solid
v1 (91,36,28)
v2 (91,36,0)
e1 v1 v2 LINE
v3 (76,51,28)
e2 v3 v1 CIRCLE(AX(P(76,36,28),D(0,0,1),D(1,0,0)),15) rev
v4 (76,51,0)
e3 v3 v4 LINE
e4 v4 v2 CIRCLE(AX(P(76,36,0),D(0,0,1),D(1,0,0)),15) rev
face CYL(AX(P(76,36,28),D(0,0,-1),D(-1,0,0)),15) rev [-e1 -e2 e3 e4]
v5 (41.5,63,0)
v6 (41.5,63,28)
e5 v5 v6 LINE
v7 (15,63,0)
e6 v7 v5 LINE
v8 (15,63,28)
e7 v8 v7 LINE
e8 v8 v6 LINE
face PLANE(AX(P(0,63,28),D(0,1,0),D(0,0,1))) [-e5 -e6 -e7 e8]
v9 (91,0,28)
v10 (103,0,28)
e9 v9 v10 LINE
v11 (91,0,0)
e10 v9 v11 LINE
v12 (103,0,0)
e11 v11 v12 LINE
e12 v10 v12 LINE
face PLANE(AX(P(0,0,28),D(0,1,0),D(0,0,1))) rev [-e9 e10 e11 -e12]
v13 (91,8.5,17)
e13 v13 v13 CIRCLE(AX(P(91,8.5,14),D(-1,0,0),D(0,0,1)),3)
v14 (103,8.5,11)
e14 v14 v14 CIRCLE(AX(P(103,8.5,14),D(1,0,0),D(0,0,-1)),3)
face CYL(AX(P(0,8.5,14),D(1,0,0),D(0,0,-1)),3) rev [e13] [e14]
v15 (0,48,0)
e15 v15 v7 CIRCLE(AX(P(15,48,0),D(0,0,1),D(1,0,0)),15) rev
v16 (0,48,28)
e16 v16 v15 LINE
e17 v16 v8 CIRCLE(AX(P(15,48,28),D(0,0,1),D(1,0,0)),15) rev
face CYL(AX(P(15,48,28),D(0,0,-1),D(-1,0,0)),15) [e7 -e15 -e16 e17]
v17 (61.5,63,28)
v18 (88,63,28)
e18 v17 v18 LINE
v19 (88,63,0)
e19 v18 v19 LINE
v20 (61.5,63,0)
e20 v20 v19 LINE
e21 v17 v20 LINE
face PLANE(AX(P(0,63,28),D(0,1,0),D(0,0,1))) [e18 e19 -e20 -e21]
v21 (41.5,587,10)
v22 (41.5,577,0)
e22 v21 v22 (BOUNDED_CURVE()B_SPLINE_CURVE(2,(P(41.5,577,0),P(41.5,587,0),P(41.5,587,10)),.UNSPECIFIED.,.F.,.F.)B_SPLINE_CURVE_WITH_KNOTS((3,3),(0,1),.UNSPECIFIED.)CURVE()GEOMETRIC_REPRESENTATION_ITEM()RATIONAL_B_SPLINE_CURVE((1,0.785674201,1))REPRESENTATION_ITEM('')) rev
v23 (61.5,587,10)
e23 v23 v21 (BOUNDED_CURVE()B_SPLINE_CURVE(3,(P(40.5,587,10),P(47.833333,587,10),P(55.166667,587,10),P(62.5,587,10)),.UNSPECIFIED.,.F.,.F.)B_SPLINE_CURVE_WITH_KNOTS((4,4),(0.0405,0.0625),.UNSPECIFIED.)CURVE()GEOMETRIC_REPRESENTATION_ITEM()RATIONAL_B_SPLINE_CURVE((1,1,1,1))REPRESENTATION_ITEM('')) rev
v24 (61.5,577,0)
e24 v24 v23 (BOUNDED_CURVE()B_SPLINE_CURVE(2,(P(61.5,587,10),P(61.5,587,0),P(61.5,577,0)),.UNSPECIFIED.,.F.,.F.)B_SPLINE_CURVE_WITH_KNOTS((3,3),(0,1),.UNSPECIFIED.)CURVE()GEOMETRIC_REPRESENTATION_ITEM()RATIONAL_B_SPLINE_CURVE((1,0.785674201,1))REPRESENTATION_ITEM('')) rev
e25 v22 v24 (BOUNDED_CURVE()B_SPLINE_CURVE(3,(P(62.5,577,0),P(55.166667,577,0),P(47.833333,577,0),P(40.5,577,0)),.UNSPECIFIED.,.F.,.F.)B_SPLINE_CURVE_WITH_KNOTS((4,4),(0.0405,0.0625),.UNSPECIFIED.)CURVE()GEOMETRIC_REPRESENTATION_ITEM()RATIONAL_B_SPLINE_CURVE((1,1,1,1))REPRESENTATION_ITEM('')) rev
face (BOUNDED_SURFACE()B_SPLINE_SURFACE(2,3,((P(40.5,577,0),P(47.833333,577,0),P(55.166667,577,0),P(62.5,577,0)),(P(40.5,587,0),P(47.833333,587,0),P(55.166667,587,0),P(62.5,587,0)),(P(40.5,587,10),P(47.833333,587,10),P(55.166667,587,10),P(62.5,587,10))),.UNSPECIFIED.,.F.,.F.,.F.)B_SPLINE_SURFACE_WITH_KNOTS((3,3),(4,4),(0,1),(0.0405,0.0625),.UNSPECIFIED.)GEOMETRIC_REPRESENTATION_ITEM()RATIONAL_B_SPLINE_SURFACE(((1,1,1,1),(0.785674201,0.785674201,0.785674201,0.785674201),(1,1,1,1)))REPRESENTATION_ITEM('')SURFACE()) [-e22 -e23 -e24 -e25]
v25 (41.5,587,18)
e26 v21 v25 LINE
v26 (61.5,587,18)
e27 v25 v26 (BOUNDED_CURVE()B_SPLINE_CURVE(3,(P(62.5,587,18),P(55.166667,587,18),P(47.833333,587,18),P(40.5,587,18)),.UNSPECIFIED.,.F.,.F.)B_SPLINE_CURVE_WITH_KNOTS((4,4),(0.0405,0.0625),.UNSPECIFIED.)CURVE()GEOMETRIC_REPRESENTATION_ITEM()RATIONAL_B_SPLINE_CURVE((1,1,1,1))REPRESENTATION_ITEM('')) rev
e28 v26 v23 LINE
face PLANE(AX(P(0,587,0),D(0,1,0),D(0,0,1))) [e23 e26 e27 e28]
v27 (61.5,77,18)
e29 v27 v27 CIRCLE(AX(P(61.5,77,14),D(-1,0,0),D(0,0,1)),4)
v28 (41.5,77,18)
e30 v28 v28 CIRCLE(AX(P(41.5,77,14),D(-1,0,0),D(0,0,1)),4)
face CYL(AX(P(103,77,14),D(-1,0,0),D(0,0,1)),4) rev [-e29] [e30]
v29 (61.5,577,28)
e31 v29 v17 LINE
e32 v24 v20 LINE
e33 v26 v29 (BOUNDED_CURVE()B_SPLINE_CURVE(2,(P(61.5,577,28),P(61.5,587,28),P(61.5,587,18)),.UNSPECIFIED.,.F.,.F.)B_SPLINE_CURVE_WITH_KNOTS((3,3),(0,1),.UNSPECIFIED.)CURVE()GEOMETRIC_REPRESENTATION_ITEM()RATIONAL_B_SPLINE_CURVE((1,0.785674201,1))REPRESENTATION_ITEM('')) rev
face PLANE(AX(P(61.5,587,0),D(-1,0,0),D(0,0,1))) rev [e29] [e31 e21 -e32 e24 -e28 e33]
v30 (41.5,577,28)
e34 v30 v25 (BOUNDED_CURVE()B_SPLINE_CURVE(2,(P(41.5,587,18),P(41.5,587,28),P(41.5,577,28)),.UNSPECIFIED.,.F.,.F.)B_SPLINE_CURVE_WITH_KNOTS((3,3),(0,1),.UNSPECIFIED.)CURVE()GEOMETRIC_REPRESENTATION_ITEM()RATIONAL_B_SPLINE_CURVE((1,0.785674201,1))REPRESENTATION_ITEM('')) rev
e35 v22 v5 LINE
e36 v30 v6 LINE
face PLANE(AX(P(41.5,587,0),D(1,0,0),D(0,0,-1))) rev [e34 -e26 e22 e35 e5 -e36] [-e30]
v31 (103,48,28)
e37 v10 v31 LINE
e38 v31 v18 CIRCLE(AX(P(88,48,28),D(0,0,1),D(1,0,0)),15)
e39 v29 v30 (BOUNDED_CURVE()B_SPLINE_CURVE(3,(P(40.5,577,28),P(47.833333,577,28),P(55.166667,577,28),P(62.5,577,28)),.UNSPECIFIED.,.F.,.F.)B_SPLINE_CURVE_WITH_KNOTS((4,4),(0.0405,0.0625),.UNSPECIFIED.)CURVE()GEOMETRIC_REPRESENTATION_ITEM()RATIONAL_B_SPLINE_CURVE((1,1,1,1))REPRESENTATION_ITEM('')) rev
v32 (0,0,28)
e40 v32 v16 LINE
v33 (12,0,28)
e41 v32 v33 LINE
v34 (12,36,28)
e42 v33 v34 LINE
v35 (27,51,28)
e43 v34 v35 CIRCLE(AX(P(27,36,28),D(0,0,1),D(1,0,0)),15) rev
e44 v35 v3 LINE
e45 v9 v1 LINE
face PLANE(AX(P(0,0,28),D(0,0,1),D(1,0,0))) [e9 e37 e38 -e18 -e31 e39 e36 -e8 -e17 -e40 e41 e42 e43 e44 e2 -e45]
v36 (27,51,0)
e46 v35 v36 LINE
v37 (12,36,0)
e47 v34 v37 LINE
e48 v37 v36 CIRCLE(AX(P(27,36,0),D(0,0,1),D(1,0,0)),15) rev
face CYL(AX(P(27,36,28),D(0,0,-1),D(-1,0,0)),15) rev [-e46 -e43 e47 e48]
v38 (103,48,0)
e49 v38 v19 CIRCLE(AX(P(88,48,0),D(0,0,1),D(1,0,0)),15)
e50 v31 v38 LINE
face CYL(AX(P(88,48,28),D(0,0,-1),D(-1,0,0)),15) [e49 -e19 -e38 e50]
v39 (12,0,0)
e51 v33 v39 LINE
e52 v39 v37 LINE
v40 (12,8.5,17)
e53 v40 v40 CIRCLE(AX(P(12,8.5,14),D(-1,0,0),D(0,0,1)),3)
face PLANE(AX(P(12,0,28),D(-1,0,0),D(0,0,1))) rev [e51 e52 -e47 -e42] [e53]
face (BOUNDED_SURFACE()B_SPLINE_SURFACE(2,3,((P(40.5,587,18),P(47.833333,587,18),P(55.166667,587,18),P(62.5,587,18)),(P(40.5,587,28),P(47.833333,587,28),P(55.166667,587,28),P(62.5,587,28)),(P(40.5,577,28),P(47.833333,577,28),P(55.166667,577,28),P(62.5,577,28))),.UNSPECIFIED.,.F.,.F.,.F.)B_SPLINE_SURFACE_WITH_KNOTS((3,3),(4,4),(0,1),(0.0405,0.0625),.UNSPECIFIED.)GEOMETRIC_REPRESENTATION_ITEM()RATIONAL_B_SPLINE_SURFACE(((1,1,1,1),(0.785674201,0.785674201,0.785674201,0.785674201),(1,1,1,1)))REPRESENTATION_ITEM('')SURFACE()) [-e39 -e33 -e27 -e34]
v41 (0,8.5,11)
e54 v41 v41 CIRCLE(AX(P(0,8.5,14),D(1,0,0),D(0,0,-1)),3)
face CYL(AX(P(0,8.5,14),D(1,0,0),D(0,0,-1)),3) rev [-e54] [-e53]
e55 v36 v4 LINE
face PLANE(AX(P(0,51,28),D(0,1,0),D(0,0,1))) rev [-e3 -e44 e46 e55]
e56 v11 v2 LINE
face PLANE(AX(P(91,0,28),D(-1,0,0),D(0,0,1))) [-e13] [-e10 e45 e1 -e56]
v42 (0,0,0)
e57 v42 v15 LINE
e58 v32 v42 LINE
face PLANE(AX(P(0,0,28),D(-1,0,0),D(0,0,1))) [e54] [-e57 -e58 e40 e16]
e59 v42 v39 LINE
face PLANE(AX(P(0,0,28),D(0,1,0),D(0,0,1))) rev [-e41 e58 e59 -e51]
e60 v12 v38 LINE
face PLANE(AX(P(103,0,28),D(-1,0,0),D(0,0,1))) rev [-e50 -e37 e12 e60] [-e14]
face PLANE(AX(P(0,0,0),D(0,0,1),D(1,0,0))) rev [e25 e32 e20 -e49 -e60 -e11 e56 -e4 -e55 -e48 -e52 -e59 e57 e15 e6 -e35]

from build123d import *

# Parameters (mm, degrees)
BOSS_EXTRU_1_DEPTH      = 28
ESQUISSE2_R             = 3
ENL_V_MAT_EXTRU_1_DEPTH = 124.943535531
ESQUISSE3_W             = 20
ESQUISSE3_H             = 28
BOSS_EXTRU_2_DEPTH      = 524
CONG_1_SIZE             = 10
ESQUISSE4_R             = 4
ENL_V_MAT_EXTRU_2_DEPTH = 591.876679285


with BuildPart() as part:
    # Esquisse1 → Boss.-Extru.1 (new body)
    with BuildSketch(Plane.XY):
        with BuildLine():
            Line((27, 51), (51.5, 51))
            Line((51.5, 51), (51.5, 63))
            Line((51.5, 63), (15, 63))
            ThreePointArc((15, 63), (4.393398282, 58.606601718), (0, 48))
            Line((0, 48), (0, 0))
            Line((0, 0), (12, 0))
            Line((12, 0), (12, 36))
            ThreePointArc((12, 36), (16.393398282, 46.606601718), (27, 51))
        make_face()
        with BuildLine():
            Line((51.5, 63), (51.5, 51))
            Line((51.5, 51), (76, 51))
            ThreePointArc((76, 51), (86.606601718, 46.606601718), (91, 36))
            Line((91, 36), (91, 0))
            Line((91, 0), (103, 0))
            Line((103, 0), (103, 48))
            ThreePointArc((103, 48), (98.606601718, 58.606601718), (88, 63))
            Line((88, 63), (51.5, 63))
        make_face()
    extrude(amount=BOSS_EXTRU_1_DEPTH)

    # Esquisse2 → Enlèv. mat.-Extru.1 (cut, through all)
    with BuildSketch(Plane(origin=(103, 0, 0), x_dir=(0, 0, -1), z_dir=(1, 0, 0))):
        with Locations((-14, 8.5)):
            Circle(ESQUISSE2_R)
    extrude(amount=-ENL_V_MAT_EXTRU_1_DEPTH, mode=Mode.SUBTRACT)

    # Esquisse3 → Boss.-Extru.2 (add)
    with BuildSketch(Plane(origin=(0, 63, 0), x_dir=(1, 0, 0), z_dir=(0, 1, 0))):
        with Locations((51.5, -14)):
            Rectangle(ESQUISSE3_W, ESQUISSE3_H)
    extrude(amount=BOSS_EXTRU_2_DEPTH)

    # Congé1
    # a fillet whose section is not a circle: 10 mm, written as the material it takes off along each edge
    with BuildSketch(Plane(origin=(16.5, 587, 0), x_dir=(0, -1, 0), z_dir=(1, 0, 0)), Plane(origin=(86.5, 587, 28), x_dir=(0, -1, 0), z_dir=(-1, 0, 0))) as cong_1_piece_1:
        with BuildLine():
            Bezier((CONG_1_SIZE, 0), (0, 0), (0, -CONG_1_SIZE), weights=[1, 0.785674201, 1])
            Line((0, -CONG_1_SIZE), (0, 0))
            Line((0, 0), (CONG_1_SIZE, 0))
        make_face()
    extrude(amount=70, mode=Mode.SUBTRACT)

    # Esquisse4 → Enlèv. mat.-Extru.2 (cut, through all)
    with BuildSketch(Plane.ZY.offset(-41.5)):
        with Locations((14, 77)):
            Circle(ESQUISSE4_R)
    extrude(amount=-ENL_V_MAT_EXTRU_2_DEPTH, mode=Mode.SUBTRACT)


solid = part.part
